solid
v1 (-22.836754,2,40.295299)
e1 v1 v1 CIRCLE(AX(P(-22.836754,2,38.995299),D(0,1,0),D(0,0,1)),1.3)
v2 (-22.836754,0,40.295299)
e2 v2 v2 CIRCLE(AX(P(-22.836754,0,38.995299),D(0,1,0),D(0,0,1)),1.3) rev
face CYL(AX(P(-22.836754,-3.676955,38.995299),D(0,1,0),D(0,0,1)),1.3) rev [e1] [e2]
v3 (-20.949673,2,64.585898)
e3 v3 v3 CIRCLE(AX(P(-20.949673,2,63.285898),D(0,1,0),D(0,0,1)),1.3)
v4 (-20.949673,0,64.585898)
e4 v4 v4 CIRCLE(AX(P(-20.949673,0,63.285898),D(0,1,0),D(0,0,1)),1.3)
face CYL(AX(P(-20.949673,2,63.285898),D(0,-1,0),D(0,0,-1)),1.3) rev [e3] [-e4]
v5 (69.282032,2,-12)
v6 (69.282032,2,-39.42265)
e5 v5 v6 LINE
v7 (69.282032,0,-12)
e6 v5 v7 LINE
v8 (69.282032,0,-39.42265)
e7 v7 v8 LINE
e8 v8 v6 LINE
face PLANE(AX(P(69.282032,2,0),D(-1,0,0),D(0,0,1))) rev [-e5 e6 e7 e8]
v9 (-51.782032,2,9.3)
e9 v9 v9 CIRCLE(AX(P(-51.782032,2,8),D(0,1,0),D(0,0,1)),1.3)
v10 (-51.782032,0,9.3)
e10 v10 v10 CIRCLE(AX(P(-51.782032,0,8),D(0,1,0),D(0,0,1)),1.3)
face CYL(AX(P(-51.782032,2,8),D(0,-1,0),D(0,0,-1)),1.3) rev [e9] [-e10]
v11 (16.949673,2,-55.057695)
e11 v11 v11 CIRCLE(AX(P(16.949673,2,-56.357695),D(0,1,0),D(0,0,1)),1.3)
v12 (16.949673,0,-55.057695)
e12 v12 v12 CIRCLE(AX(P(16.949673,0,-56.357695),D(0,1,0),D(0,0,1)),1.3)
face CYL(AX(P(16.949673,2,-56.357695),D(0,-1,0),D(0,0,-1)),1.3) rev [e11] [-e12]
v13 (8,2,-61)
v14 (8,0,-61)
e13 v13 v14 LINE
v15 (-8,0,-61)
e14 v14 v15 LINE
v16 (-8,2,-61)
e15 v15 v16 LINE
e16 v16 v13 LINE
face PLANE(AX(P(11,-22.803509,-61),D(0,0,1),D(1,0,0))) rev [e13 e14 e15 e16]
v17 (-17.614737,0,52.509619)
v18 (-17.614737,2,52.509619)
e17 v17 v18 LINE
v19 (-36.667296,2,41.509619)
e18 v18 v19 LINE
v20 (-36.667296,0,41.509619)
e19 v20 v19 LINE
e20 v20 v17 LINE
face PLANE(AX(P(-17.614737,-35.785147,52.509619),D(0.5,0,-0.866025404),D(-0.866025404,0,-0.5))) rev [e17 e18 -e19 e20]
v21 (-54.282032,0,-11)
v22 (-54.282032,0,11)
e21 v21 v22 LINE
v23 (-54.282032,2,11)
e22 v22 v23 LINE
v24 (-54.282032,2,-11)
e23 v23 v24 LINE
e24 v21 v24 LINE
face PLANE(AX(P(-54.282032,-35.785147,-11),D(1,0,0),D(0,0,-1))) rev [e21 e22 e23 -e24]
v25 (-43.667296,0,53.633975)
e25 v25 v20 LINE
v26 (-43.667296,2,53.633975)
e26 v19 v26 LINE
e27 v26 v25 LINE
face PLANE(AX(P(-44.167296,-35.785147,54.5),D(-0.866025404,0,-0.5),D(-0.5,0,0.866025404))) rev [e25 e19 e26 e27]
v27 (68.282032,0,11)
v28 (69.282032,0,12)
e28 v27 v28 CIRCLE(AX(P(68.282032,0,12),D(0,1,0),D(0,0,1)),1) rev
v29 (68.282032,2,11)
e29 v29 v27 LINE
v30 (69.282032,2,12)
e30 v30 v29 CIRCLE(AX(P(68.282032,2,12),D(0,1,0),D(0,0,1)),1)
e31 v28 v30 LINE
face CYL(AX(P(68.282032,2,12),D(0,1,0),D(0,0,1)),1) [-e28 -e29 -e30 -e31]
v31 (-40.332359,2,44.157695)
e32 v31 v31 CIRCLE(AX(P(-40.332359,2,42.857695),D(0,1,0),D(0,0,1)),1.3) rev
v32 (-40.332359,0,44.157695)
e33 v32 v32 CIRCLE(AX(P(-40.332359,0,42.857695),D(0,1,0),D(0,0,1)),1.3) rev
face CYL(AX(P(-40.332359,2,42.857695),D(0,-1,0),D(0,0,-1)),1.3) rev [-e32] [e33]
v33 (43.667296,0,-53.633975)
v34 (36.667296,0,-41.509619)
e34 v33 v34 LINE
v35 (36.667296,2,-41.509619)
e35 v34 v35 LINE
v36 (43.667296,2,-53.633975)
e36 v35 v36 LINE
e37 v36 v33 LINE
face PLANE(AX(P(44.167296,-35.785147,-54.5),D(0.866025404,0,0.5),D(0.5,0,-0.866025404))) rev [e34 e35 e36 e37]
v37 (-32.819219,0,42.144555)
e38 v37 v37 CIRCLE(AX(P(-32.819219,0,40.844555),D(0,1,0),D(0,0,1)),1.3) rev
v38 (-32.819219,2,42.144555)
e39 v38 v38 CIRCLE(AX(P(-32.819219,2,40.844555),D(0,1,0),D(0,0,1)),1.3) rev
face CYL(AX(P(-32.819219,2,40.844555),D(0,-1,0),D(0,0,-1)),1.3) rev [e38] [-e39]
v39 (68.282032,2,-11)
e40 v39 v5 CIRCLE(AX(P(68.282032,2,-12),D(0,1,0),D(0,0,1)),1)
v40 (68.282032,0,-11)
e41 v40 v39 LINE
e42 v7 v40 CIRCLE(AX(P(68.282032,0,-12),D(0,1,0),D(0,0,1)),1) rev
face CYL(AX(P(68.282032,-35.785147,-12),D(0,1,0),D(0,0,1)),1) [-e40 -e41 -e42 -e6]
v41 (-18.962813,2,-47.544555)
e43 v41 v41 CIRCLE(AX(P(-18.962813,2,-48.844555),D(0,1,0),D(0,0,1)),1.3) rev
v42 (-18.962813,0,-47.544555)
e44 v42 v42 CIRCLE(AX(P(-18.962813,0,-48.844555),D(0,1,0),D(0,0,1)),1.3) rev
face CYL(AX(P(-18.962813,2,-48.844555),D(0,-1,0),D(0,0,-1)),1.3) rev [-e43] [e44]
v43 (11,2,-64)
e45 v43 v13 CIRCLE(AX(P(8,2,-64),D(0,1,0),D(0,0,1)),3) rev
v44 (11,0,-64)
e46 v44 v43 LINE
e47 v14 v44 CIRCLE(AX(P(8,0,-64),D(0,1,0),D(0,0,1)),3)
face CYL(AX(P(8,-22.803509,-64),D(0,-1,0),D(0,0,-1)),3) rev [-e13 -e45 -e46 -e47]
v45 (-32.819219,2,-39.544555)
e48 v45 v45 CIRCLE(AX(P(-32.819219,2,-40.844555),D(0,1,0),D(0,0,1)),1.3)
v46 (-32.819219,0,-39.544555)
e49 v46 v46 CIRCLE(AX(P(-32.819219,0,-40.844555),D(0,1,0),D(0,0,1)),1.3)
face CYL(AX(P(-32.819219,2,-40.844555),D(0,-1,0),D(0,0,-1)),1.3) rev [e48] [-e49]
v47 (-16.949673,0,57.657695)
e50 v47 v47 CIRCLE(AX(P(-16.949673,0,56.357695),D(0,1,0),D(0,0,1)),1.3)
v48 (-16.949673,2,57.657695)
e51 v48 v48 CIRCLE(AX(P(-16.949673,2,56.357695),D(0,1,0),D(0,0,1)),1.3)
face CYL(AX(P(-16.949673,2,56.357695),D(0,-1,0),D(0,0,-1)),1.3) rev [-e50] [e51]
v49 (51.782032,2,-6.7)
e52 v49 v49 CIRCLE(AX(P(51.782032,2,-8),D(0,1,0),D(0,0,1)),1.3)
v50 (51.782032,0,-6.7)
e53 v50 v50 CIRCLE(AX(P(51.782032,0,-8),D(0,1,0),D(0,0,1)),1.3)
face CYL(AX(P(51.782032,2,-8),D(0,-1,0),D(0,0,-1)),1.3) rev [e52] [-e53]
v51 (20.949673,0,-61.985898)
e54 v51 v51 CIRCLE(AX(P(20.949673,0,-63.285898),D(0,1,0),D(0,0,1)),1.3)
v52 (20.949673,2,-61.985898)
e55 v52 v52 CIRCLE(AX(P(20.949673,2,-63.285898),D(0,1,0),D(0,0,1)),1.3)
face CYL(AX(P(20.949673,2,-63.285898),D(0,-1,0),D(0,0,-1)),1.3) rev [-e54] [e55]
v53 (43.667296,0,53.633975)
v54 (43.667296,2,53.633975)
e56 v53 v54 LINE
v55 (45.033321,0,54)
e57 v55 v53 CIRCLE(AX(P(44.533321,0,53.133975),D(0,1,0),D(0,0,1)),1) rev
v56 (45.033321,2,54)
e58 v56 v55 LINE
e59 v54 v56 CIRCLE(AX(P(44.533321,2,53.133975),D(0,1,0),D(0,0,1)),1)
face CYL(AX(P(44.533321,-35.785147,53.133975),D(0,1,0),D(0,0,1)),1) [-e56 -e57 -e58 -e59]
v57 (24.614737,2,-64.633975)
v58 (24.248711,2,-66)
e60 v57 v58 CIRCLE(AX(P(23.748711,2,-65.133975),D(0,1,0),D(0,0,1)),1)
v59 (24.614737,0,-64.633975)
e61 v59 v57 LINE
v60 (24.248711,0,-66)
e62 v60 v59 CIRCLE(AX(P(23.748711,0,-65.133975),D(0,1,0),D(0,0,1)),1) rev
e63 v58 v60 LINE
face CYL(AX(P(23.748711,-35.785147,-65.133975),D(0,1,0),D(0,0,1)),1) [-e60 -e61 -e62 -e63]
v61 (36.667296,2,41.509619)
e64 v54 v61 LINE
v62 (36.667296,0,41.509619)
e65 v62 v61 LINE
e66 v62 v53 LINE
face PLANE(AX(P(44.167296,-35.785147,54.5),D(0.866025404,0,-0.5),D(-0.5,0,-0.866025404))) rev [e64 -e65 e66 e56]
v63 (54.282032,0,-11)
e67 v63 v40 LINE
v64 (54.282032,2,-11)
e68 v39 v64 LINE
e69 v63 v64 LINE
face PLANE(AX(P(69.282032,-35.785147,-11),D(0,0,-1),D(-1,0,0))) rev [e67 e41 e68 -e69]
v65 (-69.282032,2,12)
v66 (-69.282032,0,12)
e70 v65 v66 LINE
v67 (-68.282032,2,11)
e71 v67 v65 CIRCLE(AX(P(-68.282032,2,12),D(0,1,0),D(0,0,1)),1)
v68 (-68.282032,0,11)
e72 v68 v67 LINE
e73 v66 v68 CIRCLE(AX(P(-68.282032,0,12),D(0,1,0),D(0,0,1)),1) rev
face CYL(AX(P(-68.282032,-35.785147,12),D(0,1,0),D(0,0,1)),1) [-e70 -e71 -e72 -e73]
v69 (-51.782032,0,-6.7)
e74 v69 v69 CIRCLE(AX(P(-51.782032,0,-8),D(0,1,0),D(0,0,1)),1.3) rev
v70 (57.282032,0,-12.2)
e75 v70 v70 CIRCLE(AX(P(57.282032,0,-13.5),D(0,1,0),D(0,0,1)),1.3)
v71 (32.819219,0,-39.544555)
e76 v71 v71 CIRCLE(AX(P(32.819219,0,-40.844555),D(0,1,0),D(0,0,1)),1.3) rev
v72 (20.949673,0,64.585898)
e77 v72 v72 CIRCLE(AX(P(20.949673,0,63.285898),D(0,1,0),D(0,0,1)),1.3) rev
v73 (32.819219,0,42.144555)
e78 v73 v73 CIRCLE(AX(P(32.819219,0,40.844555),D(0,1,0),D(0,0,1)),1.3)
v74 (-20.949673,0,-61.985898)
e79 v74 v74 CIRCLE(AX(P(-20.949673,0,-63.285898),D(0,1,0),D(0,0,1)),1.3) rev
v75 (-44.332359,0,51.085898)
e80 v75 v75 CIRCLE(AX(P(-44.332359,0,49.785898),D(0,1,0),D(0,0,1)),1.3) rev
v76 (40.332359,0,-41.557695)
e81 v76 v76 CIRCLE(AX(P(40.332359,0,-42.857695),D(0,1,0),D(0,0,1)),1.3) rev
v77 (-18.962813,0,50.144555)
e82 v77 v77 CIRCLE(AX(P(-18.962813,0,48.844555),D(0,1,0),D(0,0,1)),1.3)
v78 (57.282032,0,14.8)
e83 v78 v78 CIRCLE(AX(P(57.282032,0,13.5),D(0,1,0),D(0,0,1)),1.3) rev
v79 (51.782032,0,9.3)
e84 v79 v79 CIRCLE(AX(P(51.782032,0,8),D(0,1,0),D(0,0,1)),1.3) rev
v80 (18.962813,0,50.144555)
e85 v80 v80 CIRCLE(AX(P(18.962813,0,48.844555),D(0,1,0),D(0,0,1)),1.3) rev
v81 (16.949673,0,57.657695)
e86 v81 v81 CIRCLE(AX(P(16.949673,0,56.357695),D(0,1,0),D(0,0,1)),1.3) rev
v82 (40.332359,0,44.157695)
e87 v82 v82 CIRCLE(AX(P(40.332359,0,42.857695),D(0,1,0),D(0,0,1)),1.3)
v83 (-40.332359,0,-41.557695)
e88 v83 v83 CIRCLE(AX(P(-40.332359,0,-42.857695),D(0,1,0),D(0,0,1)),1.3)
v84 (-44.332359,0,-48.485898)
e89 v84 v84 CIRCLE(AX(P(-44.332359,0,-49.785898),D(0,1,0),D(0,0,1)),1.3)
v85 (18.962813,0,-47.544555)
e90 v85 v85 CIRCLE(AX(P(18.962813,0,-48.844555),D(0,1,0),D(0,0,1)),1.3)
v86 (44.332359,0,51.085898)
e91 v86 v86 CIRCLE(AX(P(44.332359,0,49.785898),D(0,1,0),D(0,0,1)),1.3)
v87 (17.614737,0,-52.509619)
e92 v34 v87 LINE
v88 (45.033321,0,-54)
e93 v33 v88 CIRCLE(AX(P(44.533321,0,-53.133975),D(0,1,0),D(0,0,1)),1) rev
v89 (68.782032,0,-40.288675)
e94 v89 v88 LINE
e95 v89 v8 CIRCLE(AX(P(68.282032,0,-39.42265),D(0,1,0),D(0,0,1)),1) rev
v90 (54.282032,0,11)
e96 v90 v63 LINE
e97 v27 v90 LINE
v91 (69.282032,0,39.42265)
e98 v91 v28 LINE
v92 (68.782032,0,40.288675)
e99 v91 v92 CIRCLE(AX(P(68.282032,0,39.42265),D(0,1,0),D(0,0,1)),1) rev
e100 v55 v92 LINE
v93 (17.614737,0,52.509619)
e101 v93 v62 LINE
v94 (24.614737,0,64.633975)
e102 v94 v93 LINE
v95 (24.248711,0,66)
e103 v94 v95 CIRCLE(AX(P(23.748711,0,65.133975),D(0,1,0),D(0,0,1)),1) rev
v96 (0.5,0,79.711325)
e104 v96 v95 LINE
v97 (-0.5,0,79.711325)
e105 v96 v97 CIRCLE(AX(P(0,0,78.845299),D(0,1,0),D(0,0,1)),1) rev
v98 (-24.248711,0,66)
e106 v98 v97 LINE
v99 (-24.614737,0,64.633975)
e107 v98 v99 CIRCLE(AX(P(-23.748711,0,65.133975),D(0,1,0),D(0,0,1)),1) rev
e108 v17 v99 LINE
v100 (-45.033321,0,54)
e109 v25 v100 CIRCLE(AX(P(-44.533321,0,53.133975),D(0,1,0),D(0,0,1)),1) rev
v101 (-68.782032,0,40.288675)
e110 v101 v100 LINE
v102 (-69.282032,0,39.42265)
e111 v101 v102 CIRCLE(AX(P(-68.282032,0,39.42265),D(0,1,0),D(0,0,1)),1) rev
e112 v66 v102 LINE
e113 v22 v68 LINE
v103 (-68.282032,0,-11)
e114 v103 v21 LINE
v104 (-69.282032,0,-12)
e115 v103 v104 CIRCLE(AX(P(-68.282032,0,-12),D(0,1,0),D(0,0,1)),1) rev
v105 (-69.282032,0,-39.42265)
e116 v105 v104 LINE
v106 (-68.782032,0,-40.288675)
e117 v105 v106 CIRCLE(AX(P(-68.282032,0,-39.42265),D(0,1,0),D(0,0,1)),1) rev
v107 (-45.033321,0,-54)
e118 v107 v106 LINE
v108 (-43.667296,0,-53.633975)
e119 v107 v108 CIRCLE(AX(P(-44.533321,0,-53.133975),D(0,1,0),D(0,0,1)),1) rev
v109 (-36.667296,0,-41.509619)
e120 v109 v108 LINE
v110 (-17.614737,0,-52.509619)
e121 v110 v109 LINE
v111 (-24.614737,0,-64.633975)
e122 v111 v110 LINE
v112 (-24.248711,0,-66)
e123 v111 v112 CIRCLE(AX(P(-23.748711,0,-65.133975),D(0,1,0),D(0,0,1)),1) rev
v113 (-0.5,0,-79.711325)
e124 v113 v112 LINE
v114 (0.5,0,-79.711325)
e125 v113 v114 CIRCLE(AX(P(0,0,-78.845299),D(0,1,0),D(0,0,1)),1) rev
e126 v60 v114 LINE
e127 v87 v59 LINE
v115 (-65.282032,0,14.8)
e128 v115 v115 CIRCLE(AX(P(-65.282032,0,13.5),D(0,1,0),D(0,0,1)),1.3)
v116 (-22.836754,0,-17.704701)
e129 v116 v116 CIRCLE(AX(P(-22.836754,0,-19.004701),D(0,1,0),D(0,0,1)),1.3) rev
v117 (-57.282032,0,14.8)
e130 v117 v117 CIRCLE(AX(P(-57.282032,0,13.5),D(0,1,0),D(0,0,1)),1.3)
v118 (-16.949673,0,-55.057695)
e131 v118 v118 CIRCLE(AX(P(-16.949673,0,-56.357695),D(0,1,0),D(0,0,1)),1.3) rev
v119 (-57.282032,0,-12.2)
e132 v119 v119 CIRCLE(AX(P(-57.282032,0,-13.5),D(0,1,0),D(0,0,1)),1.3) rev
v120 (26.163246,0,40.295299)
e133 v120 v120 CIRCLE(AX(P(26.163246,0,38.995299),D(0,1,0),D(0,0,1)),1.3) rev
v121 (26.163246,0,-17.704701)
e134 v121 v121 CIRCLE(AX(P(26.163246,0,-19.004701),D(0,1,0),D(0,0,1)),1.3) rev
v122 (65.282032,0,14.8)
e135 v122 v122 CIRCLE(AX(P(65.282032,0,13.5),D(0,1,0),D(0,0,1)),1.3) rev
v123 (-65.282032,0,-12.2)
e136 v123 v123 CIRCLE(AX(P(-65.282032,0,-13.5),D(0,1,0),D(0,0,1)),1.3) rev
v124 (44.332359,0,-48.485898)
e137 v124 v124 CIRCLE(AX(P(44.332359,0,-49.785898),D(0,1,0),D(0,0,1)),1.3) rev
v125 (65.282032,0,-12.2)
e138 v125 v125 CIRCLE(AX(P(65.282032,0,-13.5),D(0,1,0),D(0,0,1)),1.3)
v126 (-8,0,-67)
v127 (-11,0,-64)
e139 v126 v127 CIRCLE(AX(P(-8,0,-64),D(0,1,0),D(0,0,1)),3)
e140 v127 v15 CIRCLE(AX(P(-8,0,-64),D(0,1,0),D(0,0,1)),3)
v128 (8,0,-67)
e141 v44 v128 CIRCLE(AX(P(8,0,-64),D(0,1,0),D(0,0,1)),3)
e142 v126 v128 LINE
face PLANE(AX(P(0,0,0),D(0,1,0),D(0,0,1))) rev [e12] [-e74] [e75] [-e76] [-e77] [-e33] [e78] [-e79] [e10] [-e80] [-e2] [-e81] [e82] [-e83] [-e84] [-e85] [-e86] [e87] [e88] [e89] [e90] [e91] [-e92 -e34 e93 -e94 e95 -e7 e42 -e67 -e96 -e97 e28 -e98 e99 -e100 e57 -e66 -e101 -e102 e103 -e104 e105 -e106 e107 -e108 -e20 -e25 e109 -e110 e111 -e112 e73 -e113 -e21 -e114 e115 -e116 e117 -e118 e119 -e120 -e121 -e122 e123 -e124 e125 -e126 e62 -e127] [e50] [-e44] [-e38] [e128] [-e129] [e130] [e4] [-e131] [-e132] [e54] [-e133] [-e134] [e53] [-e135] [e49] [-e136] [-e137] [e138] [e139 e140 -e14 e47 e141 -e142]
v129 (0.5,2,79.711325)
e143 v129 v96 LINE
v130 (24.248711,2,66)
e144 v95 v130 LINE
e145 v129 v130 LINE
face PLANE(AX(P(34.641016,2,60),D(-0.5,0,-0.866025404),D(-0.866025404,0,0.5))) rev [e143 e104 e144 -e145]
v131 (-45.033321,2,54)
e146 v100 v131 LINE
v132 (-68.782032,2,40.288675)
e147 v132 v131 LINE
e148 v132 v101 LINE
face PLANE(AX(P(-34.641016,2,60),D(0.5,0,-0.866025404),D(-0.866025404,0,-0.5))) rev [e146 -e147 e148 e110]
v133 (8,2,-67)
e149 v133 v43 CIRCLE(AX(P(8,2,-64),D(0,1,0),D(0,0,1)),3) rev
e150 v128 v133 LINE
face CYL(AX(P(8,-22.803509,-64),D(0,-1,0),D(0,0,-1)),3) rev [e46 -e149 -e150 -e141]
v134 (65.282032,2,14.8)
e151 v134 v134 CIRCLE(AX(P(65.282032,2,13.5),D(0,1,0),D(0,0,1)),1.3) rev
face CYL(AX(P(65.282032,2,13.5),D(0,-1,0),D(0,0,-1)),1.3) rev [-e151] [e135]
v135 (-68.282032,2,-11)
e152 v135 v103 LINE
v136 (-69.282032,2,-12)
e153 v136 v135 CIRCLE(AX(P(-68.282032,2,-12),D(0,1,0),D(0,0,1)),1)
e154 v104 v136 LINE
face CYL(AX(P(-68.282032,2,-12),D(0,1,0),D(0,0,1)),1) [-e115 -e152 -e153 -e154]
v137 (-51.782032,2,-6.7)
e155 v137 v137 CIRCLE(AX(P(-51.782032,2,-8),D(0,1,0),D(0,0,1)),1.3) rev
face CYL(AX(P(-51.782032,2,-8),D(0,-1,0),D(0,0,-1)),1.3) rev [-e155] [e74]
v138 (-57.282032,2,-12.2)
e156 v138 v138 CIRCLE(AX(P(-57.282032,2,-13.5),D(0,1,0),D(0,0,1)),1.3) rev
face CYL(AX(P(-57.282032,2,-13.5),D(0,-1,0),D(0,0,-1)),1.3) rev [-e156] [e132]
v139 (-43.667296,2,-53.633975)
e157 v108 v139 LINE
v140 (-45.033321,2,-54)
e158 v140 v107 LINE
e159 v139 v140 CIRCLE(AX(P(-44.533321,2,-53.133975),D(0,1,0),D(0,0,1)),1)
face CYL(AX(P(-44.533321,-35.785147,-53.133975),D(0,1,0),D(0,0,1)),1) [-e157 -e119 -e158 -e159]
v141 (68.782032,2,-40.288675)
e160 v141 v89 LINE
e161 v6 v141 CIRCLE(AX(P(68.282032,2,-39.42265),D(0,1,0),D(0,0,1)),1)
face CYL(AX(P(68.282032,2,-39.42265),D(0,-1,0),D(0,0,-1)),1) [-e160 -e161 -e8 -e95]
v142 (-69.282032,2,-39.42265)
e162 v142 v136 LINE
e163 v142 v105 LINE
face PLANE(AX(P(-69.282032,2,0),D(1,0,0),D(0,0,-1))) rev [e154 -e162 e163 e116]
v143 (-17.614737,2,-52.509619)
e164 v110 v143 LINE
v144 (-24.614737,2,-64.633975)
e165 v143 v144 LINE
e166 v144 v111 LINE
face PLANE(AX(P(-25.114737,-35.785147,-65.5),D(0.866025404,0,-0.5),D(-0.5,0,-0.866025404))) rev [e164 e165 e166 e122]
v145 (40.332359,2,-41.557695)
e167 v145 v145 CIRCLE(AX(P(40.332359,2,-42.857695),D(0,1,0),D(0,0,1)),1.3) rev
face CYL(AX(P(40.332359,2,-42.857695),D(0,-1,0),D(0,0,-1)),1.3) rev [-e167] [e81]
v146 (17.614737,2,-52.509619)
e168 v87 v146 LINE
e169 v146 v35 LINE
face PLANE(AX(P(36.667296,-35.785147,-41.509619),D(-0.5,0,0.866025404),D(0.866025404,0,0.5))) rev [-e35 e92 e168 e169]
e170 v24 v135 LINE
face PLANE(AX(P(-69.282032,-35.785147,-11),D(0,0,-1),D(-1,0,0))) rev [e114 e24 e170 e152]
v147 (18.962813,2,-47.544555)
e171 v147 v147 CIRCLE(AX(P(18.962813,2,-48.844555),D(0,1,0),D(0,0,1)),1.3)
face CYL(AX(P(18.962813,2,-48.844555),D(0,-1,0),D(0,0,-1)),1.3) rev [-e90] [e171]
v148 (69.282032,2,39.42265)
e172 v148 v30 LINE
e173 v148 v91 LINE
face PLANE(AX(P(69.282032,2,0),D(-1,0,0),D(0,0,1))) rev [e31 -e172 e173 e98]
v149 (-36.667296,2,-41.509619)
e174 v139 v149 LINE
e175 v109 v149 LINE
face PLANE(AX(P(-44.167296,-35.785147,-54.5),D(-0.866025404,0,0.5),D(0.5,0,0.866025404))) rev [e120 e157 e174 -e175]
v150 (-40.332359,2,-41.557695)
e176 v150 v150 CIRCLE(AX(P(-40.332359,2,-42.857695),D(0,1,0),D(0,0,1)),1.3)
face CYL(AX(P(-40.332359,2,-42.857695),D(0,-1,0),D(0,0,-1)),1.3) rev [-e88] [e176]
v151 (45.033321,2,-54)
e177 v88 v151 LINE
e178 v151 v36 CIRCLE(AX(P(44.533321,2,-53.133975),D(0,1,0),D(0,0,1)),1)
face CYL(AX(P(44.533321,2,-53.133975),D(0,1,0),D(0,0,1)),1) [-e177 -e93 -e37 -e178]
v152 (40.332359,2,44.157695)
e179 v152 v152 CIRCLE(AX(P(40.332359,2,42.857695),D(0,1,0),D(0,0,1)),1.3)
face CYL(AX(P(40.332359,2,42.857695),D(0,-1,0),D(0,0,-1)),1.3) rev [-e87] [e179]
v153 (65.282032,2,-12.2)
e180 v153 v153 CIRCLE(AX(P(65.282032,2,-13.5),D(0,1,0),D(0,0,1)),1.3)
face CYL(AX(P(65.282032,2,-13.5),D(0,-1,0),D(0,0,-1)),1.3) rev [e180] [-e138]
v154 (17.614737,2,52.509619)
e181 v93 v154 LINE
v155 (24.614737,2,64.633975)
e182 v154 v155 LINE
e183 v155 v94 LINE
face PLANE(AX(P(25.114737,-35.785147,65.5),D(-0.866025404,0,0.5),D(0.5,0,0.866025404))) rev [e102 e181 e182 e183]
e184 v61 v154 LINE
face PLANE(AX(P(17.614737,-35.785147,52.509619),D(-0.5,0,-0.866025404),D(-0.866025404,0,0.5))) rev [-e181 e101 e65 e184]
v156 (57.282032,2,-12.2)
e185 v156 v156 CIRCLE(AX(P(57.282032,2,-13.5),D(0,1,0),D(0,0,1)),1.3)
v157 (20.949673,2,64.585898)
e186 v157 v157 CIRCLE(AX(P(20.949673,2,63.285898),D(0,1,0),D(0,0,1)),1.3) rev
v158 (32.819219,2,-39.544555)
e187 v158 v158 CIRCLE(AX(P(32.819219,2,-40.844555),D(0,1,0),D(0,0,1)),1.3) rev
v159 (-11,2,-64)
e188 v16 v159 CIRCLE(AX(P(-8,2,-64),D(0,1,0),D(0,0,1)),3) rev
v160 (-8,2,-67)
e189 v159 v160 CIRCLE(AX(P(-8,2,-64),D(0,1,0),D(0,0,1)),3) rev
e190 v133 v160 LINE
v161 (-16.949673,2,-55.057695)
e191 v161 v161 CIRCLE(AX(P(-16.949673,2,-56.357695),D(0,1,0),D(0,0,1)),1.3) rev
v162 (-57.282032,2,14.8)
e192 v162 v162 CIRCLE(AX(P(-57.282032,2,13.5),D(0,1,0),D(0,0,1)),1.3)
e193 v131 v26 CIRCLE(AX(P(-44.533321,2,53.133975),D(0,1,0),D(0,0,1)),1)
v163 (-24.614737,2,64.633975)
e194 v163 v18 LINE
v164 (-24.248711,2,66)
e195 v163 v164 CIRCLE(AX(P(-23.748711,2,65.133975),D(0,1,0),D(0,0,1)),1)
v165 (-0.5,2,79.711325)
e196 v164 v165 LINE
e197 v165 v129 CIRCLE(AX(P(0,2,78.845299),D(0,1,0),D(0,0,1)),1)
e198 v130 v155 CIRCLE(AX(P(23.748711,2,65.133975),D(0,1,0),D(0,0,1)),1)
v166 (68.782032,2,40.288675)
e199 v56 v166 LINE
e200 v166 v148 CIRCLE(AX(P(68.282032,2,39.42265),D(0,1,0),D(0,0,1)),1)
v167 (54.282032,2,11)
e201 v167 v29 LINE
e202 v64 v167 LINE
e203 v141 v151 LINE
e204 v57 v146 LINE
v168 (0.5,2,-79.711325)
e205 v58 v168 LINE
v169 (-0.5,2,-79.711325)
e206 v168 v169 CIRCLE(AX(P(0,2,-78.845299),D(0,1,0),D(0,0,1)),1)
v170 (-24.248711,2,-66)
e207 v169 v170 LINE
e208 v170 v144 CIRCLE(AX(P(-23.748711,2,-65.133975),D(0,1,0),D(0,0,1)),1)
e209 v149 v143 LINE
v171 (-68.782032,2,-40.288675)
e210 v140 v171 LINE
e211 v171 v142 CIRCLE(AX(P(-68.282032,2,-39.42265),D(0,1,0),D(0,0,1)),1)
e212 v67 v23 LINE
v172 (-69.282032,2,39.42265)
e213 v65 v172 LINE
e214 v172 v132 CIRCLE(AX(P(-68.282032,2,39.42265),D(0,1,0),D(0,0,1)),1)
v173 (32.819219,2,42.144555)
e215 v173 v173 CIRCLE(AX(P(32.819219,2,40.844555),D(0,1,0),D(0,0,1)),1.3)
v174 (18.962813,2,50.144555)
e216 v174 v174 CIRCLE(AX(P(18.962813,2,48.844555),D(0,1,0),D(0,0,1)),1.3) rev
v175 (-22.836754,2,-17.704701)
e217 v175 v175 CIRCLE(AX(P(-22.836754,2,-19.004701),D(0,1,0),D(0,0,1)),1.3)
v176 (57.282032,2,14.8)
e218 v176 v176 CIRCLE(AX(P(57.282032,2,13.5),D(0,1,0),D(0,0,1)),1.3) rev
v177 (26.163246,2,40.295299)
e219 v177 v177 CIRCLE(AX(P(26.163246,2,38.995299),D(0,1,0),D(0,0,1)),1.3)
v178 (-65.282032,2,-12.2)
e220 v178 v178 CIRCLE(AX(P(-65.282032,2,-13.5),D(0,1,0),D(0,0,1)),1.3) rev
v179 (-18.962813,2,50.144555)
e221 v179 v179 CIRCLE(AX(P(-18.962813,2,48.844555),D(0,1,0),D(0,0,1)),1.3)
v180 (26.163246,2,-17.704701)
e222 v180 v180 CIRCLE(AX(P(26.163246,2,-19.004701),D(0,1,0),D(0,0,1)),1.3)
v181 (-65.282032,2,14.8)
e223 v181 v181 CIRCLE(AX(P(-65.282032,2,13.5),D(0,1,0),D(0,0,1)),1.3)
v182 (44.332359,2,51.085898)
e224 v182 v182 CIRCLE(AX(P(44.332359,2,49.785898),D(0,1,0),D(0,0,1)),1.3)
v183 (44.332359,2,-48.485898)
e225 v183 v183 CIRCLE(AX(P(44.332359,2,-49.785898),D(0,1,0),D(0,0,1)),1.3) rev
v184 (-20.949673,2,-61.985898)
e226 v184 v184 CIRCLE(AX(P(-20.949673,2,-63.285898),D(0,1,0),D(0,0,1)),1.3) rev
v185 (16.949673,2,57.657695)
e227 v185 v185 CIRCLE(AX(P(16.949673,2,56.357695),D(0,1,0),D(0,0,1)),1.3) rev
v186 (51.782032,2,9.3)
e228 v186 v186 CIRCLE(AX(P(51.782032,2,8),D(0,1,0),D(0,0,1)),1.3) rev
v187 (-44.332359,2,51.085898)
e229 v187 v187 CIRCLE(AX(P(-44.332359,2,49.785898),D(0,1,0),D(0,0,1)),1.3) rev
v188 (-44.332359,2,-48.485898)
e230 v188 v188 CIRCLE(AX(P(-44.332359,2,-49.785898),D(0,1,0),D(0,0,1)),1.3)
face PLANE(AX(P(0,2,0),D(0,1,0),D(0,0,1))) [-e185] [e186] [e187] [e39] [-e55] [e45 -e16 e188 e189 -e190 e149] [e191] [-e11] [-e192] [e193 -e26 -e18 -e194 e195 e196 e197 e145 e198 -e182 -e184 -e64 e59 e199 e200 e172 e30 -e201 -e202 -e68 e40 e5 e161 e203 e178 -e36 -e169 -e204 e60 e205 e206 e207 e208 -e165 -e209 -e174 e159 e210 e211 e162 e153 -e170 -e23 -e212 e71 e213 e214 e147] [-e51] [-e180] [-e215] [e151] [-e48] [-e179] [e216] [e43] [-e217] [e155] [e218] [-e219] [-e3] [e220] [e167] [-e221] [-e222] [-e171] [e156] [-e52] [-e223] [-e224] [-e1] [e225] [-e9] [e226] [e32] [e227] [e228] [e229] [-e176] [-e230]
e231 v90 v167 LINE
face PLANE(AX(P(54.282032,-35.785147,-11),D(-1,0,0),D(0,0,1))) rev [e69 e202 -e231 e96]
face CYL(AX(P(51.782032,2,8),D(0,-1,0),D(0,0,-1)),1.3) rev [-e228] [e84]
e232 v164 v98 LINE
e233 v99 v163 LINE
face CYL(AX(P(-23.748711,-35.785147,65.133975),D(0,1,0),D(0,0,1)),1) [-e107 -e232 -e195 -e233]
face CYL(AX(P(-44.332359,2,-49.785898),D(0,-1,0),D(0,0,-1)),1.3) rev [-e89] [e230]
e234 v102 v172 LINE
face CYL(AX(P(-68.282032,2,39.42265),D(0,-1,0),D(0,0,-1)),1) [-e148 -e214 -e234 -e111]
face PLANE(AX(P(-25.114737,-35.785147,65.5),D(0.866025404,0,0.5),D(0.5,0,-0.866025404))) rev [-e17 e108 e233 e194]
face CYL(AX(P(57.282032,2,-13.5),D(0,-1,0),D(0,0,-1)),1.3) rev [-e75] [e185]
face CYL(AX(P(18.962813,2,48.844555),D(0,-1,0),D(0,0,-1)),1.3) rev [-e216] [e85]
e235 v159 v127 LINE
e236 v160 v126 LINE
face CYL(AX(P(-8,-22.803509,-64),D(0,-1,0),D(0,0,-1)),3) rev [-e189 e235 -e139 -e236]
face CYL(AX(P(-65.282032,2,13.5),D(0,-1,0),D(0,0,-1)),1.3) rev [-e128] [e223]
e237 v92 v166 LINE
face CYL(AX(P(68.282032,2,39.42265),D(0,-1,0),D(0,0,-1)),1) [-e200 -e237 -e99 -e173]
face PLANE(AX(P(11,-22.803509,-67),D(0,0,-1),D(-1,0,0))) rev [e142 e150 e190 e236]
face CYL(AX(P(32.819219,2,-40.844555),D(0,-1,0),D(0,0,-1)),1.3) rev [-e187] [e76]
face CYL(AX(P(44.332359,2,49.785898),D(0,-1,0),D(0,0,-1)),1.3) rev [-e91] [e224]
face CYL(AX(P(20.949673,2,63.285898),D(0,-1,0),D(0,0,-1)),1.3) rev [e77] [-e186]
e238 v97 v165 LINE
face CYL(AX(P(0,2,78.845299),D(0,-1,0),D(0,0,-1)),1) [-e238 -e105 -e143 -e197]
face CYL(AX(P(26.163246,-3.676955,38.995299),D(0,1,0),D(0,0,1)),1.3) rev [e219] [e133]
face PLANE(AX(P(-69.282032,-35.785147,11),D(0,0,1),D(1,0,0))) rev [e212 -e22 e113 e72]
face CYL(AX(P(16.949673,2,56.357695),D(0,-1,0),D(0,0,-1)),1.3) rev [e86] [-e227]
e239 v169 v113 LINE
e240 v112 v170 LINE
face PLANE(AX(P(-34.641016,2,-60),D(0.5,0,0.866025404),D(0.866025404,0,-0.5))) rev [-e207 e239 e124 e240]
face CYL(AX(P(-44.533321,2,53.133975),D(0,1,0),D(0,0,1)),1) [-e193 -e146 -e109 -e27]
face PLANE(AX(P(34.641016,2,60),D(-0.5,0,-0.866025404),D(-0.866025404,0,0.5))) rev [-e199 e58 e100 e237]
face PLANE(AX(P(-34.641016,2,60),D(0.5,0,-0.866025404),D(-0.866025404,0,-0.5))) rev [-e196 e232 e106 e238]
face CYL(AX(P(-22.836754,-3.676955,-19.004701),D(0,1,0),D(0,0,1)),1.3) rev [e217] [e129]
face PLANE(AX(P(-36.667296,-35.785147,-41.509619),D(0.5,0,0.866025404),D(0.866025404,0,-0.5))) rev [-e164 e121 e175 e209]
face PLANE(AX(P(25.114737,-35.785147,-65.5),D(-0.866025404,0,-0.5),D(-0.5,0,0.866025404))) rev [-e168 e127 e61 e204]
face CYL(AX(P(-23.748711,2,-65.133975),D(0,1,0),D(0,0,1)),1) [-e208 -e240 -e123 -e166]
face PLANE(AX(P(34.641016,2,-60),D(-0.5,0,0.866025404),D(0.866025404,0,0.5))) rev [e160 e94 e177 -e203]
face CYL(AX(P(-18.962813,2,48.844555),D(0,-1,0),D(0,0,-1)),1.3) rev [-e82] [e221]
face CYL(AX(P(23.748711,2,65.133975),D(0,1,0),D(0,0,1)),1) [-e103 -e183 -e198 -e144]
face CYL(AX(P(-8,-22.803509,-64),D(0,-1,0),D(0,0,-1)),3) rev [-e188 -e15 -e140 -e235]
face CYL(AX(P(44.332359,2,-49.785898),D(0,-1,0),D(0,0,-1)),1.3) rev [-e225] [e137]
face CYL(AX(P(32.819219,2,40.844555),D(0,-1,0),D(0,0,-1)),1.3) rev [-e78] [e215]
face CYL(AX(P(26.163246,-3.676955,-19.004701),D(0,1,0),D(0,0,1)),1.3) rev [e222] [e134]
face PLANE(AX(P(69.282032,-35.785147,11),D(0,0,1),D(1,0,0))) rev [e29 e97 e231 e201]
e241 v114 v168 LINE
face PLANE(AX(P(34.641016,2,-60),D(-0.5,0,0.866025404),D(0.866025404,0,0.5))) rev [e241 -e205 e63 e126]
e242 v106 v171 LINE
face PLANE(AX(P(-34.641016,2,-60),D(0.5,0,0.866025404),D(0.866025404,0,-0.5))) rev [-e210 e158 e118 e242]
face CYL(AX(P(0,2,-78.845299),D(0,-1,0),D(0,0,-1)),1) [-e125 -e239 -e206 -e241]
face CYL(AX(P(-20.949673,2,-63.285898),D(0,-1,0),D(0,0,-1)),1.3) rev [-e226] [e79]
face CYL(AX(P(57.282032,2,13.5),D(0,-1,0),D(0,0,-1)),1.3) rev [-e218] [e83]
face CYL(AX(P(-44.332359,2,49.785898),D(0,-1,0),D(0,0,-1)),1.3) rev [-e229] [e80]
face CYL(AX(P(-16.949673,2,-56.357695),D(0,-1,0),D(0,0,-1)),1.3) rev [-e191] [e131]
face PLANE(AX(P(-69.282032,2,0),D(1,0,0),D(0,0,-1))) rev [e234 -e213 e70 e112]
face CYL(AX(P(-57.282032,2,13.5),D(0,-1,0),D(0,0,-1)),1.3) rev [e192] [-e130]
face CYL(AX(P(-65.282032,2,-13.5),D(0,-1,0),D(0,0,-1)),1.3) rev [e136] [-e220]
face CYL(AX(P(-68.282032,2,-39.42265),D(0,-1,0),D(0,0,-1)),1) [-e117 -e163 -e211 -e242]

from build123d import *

# Parameters (mm, degrees)
SKETCH1_R           = 1.3
BOSS_EXTRUDE1_DEPTH = 2
SKETCH2_W           = 15
SKETCH2_H           = 22
CUT_EXTRUDE1_DEPTH  = 2
FILLET1_R           = 1
SKETCH3_R           = 1.3
CUT_EXTRUDE2_DEPTH  = 2
SKETCH4_W           = 22
SKETCH4_H           = 6
CUT_EXTRUDE3_DEPTH  = 2
FILLET2_R           = 3


with BuildPart() as part:
    # Sketch1 → Boss-Extrude1 (new body)
    with BuildSketch(Plane(origin=(0, 0, 0), x_dir=(1, 0, 0), z_dir=(0, 1, 0))):
        Polygon((0, -80), (69.282032303, -40), (69.282032303, 40), (0, 80), (-69.282032303, 40), (-69.282032303, -40), align=None)
        with Locations(Location((65.282032303, 13.5, 0), (0, 0, 270))):
            Circle(SKETCH1_R, mode=Mode.SUBTRACT)
        with Locations(Location((57.282032303, 13.5, 0), (0, 0, 270))):
            Circle(SKETCH1_R, mode=Mode.SUBTRACT)
        with Locations(Location((51.782032303, 8, 0), (0, 0, 270))):
            Circle(SKETCH1_R, mode=Mode.SUBTRACT)
        with Locations(Location((51.782032303, -8, 0), (0, 0, 270))):
            Circle(SKETCH1_R, mode=Mode.SUBTRACT)
        with Locations(Location((57.282032303, -13.5, 0), (0, 0, 270))):
            Circle(SKETCH1_R, mode=Mode.SUBTRACT)
        with Locations(Location((65.282032303, -13.5, 0), (0, 0, 270))):
            Circle(SKETCH1_R, mode=Mode.SUBTRACT)
        with Locations(Location((32.819219382, -40.844555434, 0), (0, 0, 270))):
            Circle(SKETCH1_R, mode=Mode.SUBTRACT)
        with Locations(Location((20.9496732, -63.285898385, 0), (0, 0, 270))):
            Circle(SKETCH1_R, mode=Mode.SUBTRACT)
        with Locations(Location((16.9496732, -56.357695155, 0), (0, 0, 270))):
            Circle(SKETCH1_R, mode=Mode.SUBTRACT)
        with Locations(Location((18.962812921, -48.844555434, 0), (0, 0, 270))):
            Circle(SKETCH1_R, mode=Mode.SUBTRACT)
        with Locations(Location((44.332359102, -49.785898385, 0), (0, 0, 270))):
            Circle(SKETCH1_R, mode=Mode.SUBTRACT)
        with Locations(Location((40.332359102, -42.857695155, 0), (0, 0, 270))):
            Circle(SKETCH1_R, mode=Mode.SUBTRACT)
        with Locations(Location((-44.332359102, -49.785898385, 0), (0, 0, 270))):
            Circle(SKETCH1_R, mode=Mode.SUBTRACT)
        with Locations(Location((-40.332359102, -42.857695155, 0), (0, 0, 270))):
            Circle(SKETCH1_R, mode=Mode.SUBTRACT)
        with Locations(Location((-32.819219382, -40.844555434, 0), (0, 0, 270))):
            Circle(SKETCH1_R, mode=Mode.SUBTRACT)
        with Locations(Location((-18.962812921, -48.844555434, 0), (0, 0, 270))):
            Circle(SKETCH1_R, mode=Mode.SUBTRACT)
        with Locations(Location((-16.9496732, -56.357695155, 0), (0, 0, 270))):
            Circle(SKETCH1_R, mode=Mode.SUBTRACT)
        with Locations(Location((-20.9496732, -63.285898385, 0), (0, 0, 270))):
            Circle(SKETCH1_R, mode=Mode.SUBTRACT)
        with Locations(Location((18.962812921, 48.844555434, 0), (0, 0, 270))):
            Circle(SKETCH1_R, mode=Mode.SUBTRACT)
        with Locations(Location((44.332359102, 49.785898385, 0), (0, 0, 270))):
            Circle(SKETCH1_R, mode=Mode.SUBTRACT)
        with Locations(Location((40.332359102, 42.857695155, 0), (0, 0, 270))):
            Circle(SKETCH1_R, mode=Mode.SUBTRACT)
        with Locations(Location((32.819219382, 40.844555434, 0), (0, 0, 270))):
            Circle(SKETCH1_R, mode=Mode.SUBTRACT)
        with Locations(Location((20.9496732, 63.285898385, 0), (0, 0, 270))):
            Circle(SKETCH1_R, mode=Mode.SUBTRACT)
        with Locations(Location((16.9496732, 56.357695155, 0), (0, 0, 270))):
            Circle(SKETCH1_R, mode=Mode.SUBTRACT)
        with Locations(Location((-65.282032303, 13.5, 0), (0, 0, 270))):
            Circle(SKETCH1_R, mode=Mode.SUBTRACT)
        with Locations(Location((-20.9496732, 63.285898385, 0), (0, 0, 270))):
            Circle(SKETCH1_R, mode=Mode.SUBTRACT)
        with Locations(Location((-16.9496732, 56.357695155, 0), (0, 0, 270))):
            Circle(SKETCH1_R, mode=Mode.SUBTRACT)
        with Locations(Location((-18.962812921, 48.844555434, 0), (0, 0, 270))):
            Circle(SKETCH1_R, mode=Mode.SUBTRACT)
        with Locations(Location((-32.819219382, 40.844555434, 0), (0, 0, 270))):
            Circle(SKETCH1_R, mode=Mode.SUBTRACT)
        with Locations(Location((-44.332359102, 49.785898385, 0), (0, 0, 270))):
            Circle(SKETCH1_R, mode=Mode.SUBTRACT)
        with Locations(Location((-40.332359102, 42.857695155, 0), (0, 0, 270))):
            Circle(SKETCH1_R, mode=Mode.SUBTRACT)
        with Locations(Location((-57.282032303, 13.5, 0), (0, 0, 270))):
            Circle(SKETCH1_R, mode=Mode.SUBTRACT)
        with Locations(Location((-51.782032303, 8, 0), (0, 0, 270))):
            Circle(SKETCH1_R, mode=Mode.SUBTRACT)
        with Locations(Location((-51.782032303, -8, 0), (0, 0, 270))):
            Circle(SKETCH1_R, mode=Mode.SUBTRACT)
        with Locations(Location((-57.282032303, -13.5, 0), (0, 0, 270))):
            Circle(SKETCH1_R, mode=Mode.SUBTRACT)
        with Locations(Location((-65.282032303, -13.5, 0), (0, 0, 270))):
            Circle(SKETCH1_R, mode=Mode.SUBTRACT)
    extrude(amount=BOSS_EXTRUDE1_DEPTH)

    # Sketch2 → Cut-Extrude1 (cut)
    with BuildSketch(Plane(origin=(0, 2, 0), x_dir=(1, 0, 0), z_dir=(0, 1, 0))):
        with Locations((61.782032303, 0)):
            Rectangle(SKETCH2_W, SKETCH2_H)
        Polygon((44.167295593, -54.5), (36.667295593, -41.509618943), (17.61473671, -52.509618943), (25.11473671, -65.5), align=None)
        Polygon((-25.11473671, -65.5), (-44.167295593, -54.5), (-36.667295593, -41.509618943), (-17.61473671, -52.509618943), align=None)
        Polygon((25.11473671, 65.5), (17.61473671, 52.509618943), (36.667295593, 41.509618943), (44.167295593, 54.5), align=None)
        Polygon((-44.167295593, 54.5), (-25.11473671, 65.5), (-17.61473671, 52.509618943), (-36.667295593, 41.509618943), align=None)
        with Locations((-61.782032303, 0)):
            Rectangle(SKETCH2_W, SKETCH2_H)
    extrude(amount=-CUT_EXTRUDE1_DEPTH, mode=Mode.SUBTRACT)

    # Fillet1
    fillet1_edges = [part.edges().sort_by_distance(p)[0] for p in [
        (69.282032303, 1, -11),
        (69.282032303, 1, 11),
        (44.167295593, 1, 54.5),
        (25.11473671, 1, 65.5),
        (-25.11473671, 1, 65.5),
        (-44.167295593, 1, 54.5),
        (25.11473671, 1, -65.5),
        (44.167295593, 1, -54.5),
        (-44.167295593, 1, -54.5),
        (-25.11473671, 1, -65.5),
        (-69.282032303, 1, 11),
        (-69.282032303, 1, -11),
        (-69.282032303, 1, -40),
        (0, 1, -80),
        (69.282032303, 1, -40),
        (69.282032303, 1, 40),
        (0, 1, 80),
        (-69.282032303, 1, 40),
    ]]
    fillet(fillet1_edges, radius=FILLET1_R)

    # Sketch3 → Cut-Extrude2 (cut)
    with BuildSketch(Plane(origin=(0, 2, 0), x_dir=(1, 0, 0), z_dir=(0, 1, 0))):
        with Locations(Location((-22.836753878, -38.995299462, 0), (0, 0, 270))):
            Circle(SKETCH3_R)
        with Locations(Location((-22.836753878, 19.004700538, 0), (0, 0, 270))):
            Circle(SKETCH3_R)
        with Locations(Location((26.163246122, 19.004700538, 0), (0, 0, 270))):
            Circle(SKETCH3_R)
        with Locations(Location((26.163246122, -38.995299462, 0), (0, 0, 270))):
            Circle(SKETCH3_R)
    extrude(amount=-CUT_EXTRUDE2_DEPTH, mode=Mode.SUBTRACT)

    # Sketch4 → Cut-Extrude3 (cut)
    with BuildSketch(Plane(origin=(0, 2, 0), x_dir=(1, 0, 0), z_dir=(0, 1, 0))):
        with Locations((0, 64)):
            Rectangle(SKETCH4_W, SKETCH4_H)
    extrude(amount=-CUT_EXTRUDE3_DEPTH, mode=Mode.SUBTRACT)

    # Fillet2
    fillet2_edges = [part.edges().sort_by_distance(p)[0] for p in [
        (11, 1, -67),
        (-11, 1, -67),
        (-11, 1, -61),
        (11, 1, -61),
    ]]
    fillet(fillet2_edges, radius=FILLET2_R - 0.0001)  # a hair under: the kernel refuses the full size


solid = part.part
